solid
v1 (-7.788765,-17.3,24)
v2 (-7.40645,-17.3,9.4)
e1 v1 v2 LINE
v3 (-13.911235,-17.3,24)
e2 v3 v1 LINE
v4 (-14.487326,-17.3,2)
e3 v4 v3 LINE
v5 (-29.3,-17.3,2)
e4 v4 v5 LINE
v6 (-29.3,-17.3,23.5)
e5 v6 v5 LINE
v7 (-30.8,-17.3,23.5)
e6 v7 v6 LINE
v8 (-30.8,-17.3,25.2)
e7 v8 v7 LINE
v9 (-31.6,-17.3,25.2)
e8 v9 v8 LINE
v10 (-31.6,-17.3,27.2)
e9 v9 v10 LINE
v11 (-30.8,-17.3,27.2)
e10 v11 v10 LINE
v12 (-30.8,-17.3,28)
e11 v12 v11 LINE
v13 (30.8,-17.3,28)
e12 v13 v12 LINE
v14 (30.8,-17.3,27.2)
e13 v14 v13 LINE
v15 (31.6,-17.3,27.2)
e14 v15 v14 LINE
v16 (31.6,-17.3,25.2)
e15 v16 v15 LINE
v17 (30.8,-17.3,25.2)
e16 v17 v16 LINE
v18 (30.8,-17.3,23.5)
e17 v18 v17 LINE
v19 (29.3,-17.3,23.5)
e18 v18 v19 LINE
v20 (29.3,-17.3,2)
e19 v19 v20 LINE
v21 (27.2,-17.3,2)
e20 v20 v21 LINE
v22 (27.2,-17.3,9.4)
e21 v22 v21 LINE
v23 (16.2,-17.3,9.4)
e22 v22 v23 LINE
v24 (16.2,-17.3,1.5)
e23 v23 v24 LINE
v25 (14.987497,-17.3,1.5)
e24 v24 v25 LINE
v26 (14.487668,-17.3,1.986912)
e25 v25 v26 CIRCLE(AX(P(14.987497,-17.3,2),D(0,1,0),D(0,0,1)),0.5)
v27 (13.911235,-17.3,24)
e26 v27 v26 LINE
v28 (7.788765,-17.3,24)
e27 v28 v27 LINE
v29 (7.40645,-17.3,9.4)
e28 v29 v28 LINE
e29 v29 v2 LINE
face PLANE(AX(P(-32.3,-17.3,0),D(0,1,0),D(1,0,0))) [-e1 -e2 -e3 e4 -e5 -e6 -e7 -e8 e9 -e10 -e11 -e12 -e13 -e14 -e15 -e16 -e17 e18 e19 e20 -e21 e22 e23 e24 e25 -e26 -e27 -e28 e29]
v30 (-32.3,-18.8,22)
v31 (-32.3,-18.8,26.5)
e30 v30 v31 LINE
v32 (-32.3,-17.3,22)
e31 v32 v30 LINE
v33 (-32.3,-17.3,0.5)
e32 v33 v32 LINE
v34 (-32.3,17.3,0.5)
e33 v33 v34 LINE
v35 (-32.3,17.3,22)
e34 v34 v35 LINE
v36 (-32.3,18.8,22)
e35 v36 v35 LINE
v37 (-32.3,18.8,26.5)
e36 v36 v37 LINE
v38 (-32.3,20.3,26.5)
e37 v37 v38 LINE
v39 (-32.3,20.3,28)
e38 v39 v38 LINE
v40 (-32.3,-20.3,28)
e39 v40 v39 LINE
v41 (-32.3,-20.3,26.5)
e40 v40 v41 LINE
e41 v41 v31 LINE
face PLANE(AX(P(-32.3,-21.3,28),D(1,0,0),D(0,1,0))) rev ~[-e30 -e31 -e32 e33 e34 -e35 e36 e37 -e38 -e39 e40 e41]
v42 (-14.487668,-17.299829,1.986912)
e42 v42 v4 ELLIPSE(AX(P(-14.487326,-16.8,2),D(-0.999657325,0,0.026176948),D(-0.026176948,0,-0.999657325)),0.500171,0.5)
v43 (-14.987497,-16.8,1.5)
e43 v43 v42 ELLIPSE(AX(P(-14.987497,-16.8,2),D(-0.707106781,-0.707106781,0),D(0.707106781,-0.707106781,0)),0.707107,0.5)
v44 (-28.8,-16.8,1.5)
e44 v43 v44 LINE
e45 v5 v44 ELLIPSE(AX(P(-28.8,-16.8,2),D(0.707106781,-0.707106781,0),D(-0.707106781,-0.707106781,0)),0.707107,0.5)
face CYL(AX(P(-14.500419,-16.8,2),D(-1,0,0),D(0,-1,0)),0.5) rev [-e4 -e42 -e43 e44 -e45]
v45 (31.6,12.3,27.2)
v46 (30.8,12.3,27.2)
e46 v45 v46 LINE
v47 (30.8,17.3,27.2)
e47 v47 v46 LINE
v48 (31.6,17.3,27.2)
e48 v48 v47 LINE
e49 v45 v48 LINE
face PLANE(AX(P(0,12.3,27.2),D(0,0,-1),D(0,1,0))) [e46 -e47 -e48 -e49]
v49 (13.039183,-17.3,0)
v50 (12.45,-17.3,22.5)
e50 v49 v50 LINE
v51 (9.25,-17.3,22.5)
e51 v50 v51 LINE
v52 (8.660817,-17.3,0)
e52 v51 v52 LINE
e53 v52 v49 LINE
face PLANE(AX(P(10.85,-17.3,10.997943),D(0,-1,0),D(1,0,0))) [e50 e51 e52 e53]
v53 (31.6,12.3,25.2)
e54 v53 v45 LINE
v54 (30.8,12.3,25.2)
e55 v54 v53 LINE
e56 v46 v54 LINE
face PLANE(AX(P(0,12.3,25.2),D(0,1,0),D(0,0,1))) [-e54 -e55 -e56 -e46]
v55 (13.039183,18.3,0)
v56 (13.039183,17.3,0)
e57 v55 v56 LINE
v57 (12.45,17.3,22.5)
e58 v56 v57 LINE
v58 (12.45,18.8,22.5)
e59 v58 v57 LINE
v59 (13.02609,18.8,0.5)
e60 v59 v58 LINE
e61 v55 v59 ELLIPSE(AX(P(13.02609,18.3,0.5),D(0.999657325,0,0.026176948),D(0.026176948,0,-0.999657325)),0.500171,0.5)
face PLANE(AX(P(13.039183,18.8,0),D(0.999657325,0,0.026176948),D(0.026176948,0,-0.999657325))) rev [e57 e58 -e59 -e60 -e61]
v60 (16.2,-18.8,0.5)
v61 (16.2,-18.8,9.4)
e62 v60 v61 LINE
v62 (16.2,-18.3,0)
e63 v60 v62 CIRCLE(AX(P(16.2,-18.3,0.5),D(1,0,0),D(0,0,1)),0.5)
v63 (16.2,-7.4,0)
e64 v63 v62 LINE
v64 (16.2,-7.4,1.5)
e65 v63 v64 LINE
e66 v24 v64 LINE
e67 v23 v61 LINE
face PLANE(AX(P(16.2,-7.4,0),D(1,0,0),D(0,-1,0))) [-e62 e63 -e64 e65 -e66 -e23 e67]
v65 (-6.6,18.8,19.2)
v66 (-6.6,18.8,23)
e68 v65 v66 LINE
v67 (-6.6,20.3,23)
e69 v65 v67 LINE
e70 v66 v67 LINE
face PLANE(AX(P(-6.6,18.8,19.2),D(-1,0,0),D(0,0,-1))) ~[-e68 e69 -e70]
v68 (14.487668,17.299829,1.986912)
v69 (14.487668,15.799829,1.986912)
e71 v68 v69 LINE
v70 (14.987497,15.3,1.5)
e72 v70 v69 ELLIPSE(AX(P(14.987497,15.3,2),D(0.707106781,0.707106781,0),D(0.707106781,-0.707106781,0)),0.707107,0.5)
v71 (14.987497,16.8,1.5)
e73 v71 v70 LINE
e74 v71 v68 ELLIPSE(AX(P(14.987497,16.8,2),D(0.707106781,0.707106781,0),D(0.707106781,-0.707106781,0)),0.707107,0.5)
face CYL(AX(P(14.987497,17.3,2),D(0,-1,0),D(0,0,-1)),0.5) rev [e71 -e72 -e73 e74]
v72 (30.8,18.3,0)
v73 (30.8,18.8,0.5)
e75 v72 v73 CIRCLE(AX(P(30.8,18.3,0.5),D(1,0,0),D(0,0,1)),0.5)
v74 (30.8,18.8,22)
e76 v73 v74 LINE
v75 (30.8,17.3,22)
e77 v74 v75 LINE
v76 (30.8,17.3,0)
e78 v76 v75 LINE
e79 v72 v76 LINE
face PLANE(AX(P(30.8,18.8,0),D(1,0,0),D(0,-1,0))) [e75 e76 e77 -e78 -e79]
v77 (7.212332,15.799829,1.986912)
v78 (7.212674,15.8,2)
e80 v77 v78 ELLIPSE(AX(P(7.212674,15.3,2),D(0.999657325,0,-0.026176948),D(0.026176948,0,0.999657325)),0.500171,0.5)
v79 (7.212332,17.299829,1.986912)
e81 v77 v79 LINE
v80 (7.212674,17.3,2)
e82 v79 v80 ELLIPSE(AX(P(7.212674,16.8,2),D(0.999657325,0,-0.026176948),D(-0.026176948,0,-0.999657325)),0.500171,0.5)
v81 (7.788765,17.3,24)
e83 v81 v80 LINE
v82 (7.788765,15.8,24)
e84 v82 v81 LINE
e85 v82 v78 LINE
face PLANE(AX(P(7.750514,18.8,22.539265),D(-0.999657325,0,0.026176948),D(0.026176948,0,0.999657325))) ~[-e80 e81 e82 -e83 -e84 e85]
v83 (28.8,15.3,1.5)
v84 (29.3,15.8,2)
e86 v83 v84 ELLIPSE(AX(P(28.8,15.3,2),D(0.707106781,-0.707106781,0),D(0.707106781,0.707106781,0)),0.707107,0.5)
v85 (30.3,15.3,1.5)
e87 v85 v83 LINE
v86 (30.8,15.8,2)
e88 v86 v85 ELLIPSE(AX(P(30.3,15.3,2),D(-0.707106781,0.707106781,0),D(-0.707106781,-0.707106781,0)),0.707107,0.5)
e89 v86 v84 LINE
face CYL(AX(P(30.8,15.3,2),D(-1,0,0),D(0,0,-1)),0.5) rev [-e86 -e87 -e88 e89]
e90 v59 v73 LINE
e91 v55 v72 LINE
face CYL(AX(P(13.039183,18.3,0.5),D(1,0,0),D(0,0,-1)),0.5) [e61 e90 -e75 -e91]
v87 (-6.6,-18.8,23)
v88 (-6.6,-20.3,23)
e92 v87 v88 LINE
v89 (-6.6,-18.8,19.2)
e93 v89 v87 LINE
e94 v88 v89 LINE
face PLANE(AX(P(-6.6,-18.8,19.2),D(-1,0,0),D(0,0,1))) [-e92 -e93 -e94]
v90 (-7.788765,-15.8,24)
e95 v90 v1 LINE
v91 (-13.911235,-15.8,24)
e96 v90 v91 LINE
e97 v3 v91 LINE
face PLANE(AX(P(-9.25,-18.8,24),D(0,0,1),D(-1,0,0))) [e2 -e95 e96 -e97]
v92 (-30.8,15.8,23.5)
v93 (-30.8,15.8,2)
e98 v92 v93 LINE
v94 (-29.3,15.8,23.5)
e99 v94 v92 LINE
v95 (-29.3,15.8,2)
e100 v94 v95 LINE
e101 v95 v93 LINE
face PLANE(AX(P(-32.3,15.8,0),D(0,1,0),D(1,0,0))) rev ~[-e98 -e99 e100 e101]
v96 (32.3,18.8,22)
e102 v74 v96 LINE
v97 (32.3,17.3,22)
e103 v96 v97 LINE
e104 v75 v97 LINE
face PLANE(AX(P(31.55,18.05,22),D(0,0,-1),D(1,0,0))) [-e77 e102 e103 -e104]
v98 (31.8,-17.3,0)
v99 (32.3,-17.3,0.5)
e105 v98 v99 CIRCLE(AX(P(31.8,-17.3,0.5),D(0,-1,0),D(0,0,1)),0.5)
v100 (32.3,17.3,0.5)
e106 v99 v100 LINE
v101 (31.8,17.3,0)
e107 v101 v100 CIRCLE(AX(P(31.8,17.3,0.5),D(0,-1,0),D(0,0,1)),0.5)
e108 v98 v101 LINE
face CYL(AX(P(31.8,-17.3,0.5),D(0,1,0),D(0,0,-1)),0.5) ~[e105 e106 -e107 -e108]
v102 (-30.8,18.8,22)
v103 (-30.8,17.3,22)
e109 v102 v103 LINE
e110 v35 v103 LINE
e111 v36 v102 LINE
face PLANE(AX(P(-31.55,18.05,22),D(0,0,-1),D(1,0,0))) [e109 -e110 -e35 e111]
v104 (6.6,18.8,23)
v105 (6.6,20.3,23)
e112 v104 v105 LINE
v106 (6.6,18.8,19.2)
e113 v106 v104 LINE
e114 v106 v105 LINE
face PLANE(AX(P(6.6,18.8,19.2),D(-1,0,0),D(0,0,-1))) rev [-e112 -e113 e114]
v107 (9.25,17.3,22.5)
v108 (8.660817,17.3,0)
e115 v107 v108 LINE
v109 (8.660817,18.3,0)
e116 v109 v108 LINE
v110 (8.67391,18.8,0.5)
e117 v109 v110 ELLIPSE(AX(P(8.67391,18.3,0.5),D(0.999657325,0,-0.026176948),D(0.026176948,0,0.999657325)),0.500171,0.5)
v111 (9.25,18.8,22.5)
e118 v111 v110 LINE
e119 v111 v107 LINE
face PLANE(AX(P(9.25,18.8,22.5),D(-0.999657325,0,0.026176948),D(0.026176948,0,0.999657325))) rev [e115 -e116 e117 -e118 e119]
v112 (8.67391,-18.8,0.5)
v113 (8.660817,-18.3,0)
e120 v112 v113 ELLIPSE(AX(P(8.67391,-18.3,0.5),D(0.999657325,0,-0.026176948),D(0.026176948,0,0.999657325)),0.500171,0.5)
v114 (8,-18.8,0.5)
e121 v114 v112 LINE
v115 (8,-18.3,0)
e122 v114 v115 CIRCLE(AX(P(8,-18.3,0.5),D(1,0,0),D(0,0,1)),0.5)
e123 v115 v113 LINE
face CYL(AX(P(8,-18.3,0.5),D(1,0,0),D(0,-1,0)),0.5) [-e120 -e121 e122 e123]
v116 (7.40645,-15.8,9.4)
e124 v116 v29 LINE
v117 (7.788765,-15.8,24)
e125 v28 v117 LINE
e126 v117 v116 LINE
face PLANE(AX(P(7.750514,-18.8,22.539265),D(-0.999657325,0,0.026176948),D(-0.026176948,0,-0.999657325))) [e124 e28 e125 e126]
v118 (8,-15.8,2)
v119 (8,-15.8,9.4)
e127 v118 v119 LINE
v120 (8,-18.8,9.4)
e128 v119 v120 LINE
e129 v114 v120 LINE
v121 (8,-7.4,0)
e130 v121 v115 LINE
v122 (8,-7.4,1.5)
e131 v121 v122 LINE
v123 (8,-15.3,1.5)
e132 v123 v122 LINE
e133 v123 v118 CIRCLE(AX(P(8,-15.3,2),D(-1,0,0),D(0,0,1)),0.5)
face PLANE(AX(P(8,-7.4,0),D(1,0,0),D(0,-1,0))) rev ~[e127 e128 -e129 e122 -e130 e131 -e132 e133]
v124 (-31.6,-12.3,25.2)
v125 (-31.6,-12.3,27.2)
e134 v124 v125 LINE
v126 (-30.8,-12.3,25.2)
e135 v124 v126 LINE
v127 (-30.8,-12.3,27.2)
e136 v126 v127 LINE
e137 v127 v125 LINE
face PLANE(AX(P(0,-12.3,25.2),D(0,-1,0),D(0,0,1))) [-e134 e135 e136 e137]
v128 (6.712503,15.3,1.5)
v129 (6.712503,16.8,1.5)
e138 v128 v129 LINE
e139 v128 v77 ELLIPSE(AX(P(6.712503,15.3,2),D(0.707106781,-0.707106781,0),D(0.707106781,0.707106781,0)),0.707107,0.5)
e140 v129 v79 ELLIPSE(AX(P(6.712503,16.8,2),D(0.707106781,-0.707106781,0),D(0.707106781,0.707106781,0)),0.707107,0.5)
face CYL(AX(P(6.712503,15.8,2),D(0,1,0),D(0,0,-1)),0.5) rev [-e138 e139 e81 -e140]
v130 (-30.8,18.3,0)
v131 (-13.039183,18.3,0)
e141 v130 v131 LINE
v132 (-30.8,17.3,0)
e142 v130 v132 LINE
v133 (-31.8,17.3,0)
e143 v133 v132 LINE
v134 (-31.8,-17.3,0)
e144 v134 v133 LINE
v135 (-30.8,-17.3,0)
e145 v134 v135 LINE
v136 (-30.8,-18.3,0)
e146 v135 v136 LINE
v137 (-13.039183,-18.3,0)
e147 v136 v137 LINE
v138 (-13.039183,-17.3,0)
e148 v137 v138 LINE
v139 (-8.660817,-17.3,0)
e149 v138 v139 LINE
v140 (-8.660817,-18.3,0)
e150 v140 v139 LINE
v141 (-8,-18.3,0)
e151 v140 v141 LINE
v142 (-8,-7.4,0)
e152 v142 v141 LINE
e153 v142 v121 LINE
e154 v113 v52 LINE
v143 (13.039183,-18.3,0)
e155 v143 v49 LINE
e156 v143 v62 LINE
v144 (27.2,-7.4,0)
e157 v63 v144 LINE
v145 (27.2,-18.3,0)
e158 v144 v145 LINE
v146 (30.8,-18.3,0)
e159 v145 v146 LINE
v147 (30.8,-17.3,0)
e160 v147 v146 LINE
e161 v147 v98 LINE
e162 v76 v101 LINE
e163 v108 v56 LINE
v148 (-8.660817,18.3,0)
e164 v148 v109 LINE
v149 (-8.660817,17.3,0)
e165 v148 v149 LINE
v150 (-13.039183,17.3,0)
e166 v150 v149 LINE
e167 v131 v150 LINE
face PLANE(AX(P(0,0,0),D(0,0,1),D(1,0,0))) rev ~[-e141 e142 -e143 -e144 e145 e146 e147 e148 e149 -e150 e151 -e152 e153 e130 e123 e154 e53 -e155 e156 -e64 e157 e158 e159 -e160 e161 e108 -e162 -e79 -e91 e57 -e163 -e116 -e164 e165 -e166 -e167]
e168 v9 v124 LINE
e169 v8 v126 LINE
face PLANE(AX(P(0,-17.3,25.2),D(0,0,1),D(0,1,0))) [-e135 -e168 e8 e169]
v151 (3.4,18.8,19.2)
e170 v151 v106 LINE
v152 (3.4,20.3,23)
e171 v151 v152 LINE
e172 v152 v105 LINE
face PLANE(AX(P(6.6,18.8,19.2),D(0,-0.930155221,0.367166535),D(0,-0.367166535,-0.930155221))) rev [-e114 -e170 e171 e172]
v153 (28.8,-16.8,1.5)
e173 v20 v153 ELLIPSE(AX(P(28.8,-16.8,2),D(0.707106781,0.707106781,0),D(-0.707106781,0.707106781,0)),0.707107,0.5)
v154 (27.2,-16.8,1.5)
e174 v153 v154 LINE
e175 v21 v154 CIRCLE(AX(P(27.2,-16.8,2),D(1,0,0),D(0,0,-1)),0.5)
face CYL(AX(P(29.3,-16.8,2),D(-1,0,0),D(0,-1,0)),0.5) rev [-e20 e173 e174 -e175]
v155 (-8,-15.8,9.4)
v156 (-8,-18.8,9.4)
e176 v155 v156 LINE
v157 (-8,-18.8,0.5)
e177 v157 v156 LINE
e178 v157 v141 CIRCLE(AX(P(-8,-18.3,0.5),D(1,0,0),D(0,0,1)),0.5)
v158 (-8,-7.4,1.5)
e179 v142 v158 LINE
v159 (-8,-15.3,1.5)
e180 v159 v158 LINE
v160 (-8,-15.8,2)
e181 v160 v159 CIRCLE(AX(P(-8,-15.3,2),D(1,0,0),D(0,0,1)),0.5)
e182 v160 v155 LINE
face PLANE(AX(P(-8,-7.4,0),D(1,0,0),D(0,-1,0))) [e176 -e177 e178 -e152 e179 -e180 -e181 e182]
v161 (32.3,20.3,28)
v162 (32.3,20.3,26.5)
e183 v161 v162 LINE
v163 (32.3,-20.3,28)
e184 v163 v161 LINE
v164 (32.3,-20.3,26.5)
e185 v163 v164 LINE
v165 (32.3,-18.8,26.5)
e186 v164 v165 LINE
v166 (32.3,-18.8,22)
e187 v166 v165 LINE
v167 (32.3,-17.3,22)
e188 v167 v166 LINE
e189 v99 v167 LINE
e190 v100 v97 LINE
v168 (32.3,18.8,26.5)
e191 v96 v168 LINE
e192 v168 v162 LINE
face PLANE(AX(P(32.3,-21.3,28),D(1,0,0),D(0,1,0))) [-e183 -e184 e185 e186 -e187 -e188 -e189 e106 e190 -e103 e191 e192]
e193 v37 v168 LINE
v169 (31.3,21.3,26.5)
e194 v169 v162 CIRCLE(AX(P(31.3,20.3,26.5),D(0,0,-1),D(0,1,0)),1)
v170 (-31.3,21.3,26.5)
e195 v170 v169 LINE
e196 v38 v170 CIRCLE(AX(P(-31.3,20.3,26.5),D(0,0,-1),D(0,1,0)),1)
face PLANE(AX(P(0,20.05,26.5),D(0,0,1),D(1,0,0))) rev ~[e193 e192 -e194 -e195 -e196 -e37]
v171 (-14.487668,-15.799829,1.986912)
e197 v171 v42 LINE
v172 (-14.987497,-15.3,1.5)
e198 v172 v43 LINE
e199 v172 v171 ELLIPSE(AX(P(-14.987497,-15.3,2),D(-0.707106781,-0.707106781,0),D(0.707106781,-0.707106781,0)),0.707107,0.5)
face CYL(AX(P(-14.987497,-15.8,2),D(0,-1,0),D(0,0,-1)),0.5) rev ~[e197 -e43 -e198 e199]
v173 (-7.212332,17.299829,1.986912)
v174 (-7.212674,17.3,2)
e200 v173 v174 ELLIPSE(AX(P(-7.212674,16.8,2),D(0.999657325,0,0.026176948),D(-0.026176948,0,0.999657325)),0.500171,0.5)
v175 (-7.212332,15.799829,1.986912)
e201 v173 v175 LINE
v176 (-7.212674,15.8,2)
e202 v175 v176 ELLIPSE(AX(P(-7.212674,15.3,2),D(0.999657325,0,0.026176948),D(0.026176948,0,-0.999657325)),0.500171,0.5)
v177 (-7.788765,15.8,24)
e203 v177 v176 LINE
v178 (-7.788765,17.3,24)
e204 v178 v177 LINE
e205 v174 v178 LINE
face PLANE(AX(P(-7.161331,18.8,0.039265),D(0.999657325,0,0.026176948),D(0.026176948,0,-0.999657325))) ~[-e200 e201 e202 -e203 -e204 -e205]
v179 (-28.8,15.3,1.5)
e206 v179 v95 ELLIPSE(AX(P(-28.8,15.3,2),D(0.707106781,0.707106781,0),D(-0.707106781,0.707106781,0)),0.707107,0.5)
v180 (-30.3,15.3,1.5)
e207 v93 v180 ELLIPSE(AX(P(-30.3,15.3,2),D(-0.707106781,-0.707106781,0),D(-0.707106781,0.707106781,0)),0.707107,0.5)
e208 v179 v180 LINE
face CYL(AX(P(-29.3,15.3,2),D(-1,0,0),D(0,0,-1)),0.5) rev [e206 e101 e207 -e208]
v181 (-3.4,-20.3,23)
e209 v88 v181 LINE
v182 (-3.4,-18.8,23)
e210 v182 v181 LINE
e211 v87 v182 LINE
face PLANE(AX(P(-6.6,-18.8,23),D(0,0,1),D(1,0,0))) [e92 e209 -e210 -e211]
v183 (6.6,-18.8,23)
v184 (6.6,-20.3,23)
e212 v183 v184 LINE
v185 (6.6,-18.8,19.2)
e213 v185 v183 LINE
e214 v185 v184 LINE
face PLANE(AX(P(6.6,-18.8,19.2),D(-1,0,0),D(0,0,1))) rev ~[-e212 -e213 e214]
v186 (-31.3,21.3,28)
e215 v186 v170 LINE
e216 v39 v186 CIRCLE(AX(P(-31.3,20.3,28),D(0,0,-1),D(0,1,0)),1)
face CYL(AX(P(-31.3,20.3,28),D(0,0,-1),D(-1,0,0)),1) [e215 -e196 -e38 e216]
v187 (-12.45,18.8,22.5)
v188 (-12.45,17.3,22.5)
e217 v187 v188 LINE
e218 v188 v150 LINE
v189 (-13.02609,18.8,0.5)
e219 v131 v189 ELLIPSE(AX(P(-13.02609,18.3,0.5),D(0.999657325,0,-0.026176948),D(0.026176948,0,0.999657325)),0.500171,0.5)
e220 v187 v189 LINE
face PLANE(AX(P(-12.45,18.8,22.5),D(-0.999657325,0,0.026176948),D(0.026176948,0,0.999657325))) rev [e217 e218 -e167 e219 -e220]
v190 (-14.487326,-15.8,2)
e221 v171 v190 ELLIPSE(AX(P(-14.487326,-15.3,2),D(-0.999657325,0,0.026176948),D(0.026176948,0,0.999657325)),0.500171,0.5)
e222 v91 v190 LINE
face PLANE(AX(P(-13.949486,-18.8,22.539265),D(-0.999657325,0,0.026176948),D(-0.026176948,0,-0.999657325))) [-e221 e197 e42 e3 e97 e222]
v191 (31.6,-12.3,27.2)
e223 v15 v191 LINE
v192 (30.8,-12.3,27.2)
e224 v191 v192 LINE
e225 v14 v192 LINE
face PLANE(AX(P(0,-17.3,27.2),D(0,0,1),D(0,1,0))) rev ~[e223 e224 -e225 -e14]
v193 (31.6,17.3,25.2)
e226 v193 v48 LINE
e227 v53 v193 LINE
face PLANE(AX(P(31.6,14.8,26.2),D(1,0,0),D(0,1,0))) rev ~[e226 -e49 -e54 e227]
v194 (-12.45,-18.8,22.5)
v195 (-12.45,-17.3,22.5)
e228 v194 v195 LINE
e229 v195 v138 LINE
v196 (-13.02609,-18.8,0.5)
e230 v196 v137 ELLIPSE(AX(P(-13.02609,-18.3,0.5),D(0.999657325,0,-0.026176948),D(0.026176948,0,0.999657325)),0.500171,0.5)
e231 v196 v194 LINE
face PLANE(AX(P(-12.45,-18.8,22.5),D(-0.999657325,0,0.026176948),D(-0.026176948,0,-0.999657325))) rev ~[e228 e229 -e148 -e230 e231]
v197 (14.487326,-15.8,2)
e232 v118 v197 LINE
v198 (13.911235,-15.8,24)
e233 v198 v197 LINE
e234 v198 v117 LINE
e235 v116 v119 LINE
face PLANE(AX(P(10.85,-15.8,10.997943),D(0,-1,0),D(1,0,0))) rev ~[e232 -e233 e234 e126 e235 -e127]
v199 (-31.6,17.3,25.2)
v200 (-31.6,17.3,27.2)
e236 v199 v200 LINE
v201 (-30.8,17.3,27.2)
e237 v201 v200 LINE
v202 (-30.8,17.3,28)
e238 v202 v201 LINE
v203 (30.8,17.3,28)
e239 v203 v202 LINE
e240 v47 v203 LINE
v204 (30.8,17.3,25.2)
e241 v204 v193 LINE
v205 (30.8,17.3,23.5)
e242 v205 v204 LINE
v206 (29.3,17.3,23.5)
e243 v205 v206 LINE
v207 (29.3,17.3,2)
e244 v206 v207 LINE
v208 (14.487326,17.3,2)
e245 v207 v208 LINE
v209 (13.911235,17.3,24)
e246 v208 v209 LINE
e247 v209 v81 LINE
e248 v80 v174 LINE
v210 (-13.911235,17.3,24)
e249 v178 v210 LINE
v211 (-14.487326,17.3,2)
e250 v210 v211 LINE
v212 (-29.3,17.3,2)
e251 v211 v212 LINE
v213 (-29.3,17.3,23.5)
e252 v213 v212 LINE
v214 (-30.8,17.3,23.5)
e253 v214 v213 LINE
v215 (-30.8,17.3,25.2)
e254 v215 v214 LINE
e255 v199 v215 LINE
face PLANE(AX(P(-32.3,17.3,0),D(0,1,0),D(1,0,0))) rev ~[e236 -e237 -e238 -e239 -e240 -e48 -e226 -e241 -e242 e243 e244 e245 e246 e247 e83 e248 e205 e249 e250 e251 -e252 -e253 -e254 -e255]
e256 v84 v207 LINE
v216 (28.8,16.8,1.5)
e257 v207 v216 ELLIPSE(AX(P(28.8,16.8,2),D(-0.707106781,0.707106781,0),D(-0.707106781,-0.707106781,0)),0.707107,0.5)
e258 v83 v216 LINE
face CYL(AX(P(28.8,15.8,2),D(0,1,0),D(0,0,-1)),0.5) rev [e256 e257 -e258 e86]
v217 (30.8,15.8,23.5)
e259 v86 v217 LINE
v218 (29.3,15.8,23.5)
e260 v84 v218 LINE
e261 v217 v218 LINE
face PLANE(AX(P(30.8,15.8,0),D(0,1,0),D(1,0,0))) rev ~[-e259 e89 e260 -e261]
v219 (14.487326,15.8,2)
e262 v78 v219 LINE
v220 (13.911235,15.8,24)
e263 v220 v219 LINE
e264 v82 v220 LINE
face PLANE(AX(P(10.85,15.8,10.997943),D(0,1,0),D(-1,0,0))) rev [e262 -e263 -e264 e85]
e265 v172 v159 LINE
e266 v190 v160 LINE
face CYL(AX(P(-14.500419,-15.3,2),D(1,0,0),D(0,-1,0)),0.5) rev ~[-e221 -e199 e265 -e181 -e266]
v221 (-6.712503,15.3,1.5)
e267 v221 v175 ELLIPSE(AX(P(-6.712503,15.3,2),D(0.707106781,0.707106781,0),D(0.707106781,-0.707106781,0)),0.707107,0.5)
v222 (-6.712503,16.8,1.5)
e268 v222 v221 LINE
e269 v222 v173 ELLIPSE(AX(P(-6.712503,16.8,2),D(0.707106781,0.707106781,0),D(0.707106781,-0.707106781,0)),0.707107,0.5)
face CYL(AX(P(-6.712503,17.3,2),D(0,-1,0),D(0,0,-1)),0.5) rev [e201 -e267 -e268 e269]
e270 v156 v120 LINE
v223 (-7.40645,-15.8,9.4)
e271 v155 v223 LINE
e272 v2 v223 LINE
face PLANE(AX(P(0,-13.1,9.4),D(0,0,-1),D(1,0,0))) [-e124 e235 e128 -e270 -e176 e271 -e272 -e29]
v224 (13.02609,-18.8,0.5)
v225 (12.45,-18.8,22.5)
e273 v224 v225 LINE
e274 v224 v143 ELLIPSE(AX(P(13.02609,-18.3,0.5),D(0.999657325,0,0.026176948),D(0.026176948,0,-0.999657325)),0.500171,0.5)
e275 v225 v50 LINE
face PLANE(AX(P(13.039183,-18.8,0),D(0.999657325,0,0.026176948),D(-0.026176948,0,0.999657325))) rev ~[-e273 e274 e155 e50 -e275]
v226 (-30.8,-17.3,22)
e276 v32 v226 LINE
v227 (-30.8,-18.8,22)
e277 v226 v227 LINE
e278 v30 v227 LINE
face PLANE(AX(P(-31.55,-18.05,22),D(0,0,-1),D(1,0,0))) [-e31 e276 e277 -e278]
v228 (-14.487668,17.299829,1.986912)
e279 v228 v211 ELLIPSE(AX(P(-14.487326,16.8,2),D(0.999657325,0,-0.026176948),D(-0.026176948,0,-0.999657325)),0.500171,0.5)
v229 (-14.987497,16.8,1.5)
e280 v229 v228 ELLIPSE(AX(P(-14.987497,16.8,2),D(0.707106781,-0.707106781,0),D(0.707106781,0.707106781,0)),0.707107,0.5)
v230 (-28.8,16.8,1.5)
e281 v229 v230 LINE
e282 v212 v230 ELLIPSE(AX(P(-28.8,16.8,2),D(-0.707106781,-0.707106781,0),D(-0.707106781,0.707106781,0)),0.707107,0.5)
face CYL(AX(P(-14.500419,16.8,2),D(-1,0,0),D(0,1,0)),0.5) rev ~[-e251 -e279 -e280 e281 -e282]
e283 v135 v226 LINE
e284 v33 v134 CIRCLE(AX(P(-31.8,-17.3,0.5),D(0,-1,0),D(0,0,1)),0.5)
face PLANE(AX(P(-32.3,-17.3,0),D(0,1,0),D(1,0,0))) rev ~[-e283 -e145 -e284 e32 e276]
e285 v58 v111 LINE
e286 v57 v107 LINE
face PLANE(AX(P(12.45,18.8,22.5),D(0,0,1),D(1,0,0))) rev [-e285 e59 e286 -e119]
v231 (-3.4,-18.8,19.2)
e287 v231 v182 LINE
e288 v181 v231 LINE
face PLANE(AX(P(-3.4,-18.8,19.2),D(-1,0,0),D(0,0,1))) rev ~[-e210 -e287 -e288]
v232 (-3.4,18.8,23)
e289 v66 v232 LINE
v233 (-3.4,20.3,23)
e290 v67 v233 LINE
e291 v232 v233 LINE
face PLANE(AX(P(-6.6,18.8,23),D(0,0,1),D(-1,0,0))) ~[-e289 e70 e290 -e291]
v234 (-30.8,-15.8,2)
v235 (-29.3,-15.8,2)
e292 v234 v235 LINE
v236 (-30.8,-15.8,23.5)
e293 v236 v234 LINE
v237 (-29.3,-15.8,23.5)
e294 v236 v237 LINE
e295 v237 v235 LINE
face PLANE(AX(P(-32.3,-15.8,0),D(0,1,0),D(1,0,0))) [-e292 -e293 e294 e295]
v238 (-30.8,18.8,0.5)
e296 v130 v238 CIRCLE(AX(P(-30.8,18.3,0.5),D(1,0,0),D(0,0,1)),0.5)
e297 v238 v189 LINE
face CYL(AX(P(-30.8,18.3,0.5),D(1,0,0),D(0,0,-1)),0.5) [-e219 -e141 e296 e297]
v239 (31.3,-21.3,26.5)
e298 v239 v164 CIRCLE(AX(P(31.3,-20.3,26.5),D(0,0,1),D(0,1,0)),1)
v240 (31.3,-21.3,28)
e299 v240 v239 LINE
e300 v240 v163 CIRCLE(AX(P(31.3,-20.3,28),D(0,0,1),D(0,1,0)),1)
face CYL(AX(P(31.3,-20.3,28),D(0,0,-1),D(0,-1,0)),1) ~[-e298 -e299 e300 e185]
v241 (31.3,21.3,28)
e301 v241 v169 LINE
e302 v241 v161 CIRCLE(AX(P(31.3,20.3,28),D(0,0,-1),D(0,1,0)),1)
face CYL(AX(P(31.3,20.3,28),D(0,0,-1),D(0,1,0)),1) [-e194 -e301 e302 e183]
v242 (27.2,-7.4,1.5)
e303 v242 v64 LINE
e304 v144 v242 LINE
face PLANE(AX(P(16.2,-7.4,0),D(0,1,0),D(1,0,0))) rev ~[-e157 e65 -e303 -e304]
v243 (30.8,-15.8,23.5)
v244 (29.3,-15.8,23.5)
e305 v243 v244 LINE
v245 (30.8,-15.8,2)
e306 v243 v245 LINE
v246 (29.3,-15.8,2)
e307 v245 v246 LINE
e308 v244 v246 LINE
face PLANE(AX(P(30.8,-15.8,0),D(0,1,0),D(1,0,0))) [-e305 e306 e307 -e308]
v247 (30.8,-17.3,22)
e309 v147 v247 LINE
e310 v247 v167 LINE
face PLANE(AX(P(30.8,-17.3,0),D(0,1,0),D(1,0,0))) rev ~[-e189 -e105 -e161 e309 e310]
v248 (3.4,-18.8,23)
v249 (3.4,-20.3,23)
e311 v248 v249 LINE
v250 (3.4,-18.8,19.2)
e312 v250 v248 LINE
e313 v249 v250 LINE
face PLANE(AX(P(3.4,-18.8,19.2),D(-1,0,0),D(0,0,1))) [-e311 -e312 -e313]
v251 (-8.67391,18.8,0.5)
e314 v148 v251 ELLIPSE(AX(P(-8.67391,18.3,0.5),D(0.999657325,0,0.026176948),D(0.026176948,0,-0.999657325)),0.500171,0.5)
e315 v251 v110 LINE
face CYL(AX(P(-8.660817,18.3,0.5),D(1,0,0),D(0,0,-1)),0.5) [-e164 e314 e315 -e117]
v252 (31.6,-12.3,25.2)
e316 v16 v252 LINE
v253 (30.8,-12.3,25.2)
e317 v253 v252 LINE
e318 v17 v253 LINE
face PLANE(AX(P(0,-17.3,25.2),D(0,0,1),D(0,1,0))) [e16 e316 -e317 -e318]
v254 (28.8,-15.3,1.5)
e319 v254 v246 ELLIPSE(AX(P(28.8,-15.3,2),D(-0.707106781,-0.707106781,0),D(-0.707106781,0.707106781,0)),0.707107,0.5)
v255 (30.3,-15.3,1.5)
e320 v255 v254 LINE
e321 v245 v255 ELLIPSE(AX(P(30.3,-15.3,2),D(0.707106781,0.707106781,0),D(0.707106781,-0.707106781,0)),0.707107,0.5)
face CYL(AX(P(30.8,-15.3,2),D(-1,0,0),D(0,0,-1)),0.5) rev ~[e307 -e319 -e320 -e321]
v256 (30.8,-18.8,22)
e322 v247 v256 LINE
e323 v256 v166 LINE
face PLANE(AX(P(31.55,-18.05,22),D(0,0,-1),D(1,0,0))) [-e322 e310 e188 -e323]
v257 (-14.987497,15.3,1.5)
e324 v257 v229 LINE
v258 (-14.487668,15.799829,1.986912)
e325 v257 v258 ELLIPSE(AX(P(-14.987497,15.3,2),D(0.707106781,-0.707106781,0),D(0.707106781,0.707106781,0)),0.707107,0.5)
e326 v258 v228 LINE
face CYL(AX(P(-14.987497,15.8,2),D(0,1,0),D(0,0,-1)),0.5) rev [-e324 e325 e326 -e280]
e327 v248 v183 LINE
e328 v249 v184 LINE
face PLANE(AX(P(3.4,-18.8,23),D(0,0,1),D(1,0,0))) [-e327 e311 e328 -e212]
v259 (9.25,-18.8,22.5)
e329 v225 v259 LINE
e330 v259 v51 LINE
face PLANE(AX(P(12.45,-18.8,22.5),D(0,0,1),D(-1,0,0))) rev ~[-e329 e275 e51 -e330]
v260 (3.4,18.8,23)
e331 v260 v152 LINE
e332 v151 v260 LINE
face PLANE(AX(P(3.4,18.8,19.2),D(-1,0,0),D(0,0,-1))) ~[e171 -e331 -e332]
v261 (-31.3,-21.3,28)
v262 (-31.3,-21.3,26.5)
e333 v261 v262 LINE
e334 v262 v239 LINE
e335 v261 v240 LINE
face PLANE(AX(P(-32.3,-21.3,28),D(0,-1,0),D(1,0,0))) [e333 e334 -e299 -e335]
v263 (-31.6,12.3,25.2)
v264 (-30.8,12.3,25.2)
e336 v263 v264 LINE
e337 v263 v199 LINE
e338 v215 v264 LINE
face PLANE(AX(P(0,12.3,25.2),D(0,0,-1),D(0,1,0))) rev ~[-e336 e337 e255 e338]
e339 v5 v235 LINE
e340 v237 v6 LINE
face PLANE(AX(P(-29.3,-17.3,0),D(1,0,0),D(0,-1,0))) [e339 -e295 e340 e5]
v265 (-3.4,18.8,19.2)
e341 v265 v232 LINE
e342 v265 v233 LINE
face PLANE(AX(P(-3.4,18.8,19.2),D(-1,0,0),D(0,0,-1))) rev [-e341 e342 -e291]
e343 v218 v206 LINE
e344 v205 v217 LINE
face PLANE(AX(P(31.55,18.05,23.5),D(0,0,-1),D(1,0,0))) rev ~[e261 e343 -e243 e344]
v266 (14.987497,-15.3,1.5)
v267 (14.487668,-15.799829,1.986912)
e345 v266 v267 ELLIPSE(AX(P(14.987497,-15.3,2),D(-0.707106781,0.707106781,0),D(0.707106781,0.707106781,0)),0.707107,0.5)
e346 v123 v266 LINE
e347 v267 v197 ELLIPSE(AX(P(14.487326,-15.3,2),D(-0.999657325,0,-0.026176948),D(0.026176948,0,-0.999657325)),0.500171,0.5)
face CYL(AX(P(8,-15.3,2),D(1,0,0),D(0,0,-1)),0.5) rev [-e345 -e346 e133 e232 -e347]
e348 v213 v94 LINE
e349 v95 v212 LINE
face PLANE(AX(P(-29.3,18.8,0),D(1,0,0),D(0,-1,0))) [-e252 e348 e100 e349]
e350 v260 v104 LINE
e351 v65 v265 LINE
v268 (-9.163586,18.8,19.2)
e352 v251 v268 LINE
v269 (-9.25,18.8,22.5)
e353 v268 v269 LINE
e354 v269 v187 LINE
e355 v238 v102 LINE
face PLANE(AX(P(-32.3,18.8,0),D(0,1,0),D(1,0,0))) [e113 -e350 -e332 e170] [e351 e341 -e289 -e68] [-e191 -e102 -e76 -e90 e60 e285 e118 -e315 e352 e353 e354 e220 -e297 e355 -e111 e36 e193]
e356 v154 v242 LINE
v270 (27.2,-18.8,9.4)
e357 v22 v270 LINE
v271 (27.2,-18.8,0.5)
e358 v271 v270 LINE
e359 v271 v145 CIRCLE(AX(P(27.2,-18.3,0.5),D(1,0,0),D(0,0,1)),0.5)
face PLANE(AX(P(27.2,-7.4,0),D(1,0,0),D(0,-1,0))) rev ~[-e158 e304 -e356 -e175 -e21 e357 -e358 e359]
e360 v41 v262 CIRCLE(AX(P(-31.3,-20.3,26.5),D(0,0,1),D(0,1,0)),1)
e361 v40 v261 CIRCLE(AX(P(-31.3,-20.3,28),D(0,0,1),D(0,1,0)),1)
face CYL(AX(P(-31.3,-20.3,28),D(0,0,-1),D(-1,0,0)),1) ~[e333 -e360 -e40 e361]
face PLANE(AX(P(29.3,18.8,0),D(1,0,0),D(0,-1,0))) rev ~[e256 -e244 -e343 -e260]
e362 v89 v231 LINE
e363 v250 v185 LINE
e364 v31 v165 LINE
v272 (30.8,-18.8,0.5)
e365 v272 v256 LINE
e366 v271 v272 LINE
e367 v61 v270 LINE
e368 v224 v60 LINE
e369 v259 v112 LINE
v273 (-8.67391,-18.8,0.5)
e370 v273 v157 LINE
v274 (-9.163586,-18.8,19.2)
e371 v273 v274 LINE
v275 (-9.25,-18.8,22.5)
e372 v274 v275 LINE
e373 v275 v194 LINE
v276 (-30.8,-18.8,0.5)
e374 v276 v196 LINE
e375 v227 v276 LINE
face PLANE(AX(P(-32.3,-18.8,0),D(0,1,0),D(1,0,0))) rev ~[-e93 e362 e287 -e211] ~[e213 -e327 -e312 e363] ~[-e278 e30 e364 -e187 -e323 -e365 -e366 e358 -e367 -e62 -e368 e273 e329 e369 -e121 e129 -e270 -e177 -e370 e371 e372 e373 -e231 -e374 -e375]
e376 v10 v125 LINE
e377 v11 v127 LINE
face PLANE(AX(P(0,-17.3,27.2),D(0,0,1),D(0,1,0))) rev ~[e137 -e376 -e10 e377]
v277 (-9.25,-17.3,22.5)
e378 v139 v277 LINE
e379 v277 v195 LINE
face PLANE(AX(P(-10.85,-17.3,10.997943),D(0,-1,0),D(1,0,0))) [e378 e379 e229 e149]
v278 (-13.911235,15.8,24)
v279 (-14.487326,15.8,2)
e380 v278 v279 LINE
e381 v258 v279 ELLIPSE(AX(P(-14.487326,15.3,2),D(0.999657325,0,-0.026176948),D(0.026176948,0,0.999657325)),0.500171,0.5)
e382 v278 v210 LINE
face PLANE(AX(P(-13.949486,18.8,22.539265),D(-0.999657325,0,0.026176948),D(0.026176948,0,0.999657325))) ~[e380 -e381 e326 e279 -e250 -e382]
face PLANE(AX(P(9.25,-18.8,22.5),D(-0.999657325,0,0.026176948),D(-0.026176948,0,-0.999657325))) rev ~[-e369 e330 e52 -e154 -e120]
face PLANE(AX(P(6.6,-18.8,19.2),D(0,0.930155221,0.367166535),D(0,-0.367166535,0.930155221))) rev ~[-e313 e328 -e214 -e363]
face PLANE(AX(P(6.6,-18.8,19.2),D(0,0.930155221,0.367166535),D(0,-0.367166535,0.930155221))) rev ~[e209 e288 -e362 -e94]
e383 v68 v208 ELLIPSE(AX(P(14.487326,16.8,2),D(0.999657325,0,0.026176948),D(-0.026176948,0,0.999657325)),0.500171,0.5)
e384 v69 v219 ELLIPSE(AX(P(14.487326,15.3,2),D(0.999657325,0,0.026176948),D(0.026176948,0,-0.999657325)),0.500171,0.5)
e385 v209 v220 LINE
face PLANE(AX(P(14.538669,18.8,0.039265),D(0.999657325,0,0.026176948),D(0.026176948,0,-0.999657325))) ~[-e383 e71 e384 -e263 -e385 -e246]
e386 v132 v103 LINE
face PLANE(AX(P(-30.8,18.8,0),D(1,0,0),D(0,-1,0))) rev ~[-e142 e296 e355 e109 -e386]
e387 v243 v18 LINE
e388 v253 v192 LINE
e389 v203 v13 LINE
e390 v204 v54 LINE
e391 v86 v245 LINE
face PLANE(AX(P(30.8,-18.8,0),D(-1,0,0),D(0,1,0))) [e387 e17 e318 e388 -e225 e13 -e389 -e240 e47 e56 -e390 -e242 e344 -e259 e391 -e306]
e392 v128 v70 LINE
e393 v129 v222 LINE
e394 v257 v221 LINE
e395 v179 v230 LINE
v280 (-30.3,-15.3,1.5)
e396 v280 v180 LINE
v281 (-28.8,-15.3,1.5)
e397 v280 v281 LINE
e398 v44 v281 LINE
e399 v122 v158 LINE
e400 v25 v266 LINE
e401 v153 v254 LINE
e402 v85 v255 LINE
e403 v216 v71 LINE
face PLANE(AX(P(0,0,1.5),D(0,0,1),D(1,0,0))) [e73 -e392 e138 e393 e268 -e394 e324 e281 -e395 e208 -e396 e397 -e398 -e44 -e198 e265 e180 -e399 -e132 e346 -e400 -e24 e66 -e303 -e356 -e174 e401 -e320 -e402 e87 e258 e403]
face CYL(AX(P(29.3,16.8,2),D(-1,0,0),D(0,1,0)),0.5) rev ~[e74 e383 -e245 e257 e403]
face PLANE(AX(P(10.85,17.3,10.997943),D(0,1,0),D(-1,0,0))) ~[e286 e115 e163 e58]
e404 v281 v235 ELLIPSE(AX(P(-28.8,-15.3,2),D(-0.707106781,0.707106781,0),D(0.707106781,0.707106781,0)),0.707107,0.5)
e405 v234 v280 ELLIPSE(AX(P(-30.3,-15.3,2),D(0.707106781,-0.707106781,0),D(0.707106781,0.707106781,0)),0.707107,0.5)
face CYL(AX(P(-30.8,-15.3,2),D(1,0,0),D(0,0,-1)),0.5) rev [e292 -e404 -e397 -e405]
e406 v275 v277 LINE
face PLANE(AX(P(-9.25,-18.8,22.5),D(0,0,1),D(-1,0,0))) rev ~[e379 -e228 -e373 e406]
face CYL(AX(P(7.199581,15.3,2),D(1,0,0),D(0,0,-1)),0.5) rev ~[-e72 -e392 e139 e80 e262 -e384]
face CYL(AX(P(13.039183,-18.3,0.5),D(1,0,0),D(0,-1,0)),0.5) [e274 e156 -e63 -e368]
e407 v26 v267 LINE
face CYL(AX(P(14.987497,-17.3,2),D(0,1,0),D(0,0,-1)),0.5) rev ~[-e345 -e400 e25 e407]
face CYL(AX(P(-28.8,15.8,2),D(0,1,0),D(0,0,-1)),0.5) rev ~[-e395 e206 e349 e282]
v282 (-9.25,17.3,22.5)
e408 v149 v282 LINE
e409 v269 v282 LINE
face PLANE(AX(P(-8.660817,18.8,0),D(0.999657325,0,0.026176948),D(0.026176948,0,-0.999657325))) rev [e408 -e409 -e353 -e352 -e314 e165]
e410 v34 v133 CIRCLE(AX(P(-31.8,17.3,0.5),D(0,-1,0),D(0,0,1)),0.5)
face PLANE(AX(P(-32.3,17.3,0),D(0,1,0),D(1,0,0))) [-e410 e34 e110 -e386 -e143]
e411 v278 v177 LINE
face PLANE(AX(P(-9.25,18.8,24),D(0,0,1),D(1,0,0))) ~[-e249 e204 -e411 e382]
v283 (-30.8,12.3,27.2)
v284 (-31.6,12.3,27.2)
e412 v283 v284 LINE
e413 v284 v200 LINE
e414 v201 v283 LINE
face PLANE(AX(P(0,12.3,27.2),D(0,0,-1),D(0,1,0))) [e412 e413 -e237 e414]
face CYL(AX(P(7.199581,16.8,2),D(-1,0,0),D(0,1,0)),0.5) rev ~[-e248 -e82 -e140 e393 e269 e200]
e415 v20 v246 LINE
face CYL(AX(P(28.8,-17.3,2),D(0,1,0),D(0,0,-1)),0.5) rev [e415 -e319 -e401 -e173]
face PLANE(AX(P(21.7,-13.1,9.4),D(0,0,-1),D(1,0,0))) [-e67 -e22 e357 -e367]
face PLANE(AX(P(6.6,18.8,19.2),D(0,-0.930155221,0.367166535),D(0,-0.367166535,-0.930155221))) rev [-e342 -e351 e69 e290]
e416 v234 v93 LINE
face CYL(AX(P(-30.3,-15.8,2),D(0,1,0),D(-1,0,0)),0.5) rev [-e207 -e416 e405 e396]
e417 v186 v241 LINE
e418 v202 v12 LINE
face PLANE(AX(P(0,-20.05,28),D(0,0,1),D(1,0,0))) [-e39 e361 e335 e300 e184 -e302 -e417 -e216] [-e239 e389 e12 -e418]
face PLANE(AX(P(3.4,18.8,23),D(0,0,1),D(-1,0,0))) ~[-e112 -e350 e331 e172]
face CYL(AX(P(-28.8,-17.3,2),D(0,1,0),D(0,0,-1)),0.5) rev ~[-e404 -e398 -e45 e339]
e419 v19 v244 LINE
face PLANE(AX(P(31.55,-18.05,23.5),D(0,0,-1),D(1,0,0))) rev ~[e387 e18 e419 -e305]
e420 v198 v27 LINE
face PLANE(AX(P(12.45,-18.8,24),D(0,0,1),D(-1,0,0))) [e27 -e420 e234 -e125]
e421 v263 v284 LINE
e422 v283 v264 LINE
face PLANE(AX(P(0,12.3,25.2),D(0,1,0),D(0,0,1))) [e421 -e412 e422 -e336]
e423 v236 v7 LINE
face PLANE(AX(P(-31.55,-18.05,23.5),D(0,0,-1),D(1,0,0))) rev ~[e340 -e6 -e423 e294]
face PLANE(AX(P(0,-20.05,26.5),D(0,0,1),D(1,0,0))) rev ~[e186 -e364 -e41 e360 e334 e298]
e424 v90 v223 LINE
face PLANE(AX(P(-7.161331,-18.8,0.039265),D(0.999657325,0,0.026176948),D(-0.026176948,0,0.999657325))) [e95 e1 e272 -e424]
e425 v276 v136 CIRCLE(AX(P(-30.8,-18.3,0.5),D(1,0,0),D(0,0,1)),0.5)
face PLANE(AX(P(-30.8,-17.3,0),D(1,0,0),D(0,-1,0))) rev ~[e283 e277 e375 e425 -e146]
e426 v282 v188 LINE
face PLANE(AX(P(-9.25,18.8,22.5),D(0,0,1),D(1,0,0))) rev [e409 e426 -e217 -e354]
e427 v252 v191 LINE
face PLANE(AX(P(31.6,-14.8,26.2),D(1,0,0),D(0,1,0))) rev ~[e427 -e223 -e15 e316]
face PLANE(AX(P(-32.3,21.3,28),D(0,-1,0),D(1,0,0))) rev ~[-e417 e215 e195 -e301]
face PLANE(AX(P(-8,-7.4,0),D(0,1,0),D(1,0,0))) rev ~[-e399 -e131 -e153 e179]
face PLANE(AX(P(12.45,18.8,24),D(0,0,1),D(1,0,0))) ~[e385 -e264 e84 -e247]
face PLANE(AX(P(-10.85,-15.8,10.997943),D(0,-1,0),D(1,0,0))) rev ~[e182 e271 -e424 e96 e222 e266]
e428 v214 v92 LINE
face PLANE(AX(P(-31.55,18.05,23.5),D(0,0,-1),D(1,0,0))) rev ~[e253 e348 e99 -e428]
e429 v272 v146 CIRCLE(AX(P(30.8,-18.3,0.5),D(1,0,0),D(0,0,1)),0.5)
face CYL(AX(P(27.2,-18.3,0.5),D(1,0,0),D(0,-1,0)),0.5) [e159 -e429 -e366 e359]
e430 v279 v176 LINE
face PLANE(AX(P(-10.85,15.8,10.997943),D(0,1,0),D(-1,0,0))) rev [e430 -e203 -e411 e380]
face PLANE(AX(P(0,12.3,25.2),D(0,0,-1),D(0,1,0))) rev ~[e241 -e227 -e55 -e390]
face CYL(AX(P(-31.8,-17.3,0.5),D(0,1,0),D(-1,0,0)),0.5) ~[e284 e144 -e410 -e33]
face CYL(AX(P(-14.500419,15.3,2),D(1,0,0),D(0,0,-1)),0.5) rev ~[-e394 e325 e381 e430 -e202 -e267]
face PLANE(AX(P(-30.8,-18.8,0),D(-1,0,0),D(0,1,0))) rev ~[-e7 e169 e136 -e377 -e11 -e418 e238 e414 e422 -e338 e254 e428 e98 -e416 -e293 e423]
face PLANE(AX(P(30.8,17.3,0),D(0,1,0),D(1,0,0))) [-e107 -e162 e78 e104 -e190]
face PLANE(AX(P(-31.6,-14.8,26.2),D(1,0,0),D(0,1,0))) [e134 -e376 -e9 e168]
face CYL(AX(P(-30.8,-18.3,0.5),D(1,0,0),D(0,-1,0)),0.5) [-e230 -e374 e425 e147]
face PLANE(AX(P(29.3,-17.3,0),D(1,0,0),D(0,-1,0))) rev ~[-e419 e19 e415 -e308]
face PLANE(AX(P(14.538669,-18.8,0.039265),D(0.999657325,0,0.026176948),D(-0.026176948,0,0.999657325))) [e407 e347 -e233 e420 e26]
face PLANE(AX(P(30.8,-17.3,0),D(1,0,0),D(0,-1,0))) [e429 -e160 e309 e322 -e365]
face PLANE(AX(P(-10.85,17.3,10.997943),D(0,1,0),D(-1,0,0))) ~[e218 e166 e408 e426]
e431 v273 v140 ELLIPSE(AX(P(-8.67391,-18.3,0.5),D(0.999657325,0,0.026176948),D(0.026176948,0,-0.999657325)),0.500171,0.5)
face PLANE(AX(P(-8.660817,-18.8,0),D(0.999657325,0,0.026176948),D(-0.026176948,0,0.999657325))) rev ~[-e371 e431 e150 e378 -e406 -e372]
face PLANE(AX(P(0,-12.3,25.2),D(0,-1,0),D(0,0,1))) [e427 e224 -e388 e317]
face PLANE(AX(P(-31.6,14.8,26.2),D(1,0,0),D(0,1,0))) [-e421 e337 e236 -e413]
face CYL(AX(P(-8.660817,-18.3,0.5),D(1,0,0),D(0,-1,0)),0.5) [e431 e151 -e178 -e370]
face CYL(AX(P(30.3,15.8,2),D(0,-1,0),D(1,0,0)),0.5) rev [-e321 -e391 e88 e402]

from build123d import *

# Parameters (mm, degrees)
F0_W      = 64.6
F0_H      = 37.6
F1_DEPTH  = 28
F3_DEPTH  = 1.5
F4_W      = 1.5
F4_H      = 1.5
F5_DEPTH  = 22
F6_T      = -1.5
F7_W      = 64.6
F7_H      = 2.5
F8_DEPTH  = 1.5
F9_W      = 5
F9_H      = 2
F10_DEPTH = 31.6
F11_W     = 3.2
F11_H     = 3.8
F12_DEPTH = 1.5
F14_DEPTH = 38.901
F15_W     = 16
F15_H     = 11.4
F15_W_2   = 11
F16_DEPTH = 9.4
F17_R     = 1
F18_R     = 0.5


# Not quite as in the source:
# - two fillets or chamfers of one size are made in one step
# - a pattern or mirror of a feature is missing from the dataset's text; its kind, count and spacing are read off the source's solid


with BuildPart() as f1:
    # F0 (on Top) → F1 (new body)
    with BuildSketch(Plane.XY):
        Rectangle(F0_W, F0_H)
    extrude(amount=F1_DEPTH)

    # F2 (on face) → F3 (cut)
    with BuildSketch(Plane.XZ.offset(18.8)):
        Polygon((-13.0391832353, 0), (-8.6608167647, 0), (-9.25, 22.5), (-12.45, 22.5), align=None)
        Polygon((12.45, 22.5), (9.25, 22.5), (8.6608167647, 0), (13.0391832353, 0), align=None)
    f3 = extrude(amount=-F3_DEPTH, mode=Mode.SUBTRACT)

    # F3_copies: F3 across plane
    add(f3.mirror(Plane.ZX), mode=Mode.SUBTRACT)

    # F4 (on face) → F5 (cut)
    with BuildSketch(Plane(origin=(0, 0, 0), x_dir=(1, 0, 0), z_dir=(0, 0, -1))):
        with Locations((-31.55, 18.05)):
            Rectangle(F4_W, F4_H)
        with Locations((31.55, 18.05)):
            Rectangle(F4_W, F4_H)
        with Locations((31.55, -18.05)):
            Rectangle(F4_W, F4_H)
        with Locations((-31.55, -18.05)):
            Rectangle(F4_W, F4_H)
    extrude(amount=-F5_DEPTH, mode=Mode.SUBTRACT)

    # F6
    f6_openings = [f1.faces().sort_by_distance(p)[0] for p in [
        (0, 0, 28),
    ]]
    offset(amount=F6_T, openings=f6_openings, kind=Kind.INTERSECTION)

    # F7 (on face) → F8 (join)
    with BuildSketch(Plane.XY.offset(28)):
        with Locations((0, -20.05)):
            Rectangle(F7_W, F7_H)
        with Locations((0, 20.05)):
            Rectangle(F7_W, F7_H)
    extrude(amount=-F8_DEPTH)

    # F9 (on Right) → F10 (cut, symmetric)
    with BuildSketch(Plane.YZ):
        with Locations((-14.8, 26.2)):
            Rectangle(F9_W, F9_H)
        with Locations((14.8, 26.2)):
            Rectangle(F9_W, F9_H)
    extrude(amount=F10_DEPTH, both=True, mode=Mode.SUBTRACT)

    # F11 (on face) → F12 (join)
    with BuildSketch(Plane.XZ.offset(18.8)):
        with Locations((-5, 21.1)):
            Rectangle(F11_W, F11_H)
        with Locations((5, 21.1)):
            Rectangle(F11_W, F11_H)
    f12 = extrude(amount=F12_DEPTH)

    # F12_copies: F12 across plane
    add(f12.mirror(Plane.ZX))

    # F13 (on face) → F14 (cut, through all)
    with BuildSketch(Plane.YZ.offset(6.6)):
        Polygon((-18.8, 19.2), (-20.3, 23), (-20.3, 19.2), align=None)
    f14 = extrude(amount=-F14_DEPTH, mode=Mode.SUBTRACT)

    # F14_copies: F14 across plane
    add(f14.mirror(Plane.ZX), mode=Mode.SUBTRACT)

    # F15 (on face) → F16 (cut)
    with BuildSketch(Plane(origin=(0, 0, 0), x_dir=(1, 0, 0), z_dir=(0, 0, -1))):
        with Locations((0, 13.1)):
            Rectangle(F15_W, F15_H)
        with Locations((21.7, 13.1)):
            Rectangle(F15_W_2, F15_H)
    extrude(amount=-F16_DEPTH, mode=Mode.SUBTRACT)

    # F17
    f17_edges = [f1.edges().sort_by_distance(p)[0] for p in [
        (32.3, -21.3, 27.25),
        (32.3, 21.3, 27.25),
        (-32.3, -21.3, 27.25),
        (-32.3, 21.3, 27.25),
    ]]
    fillet(f17_edges, radius=F17_R)

    # F18
    f18_edges = [f1.edges().sort_by_distance(p)[0] for p in [
        (32.3, 0, 0),
        (29, -18.8, 0),
        (14.619592, -18.8, 0),
        (-8.330408, -18.8, 0),
        (-21.919592, -18.8, 0),
        (-32.3, 0, 0),
        (0, 18.8, 0),
        (8.330408, -18.8, 0),
        (-21.919592, 18.8, 0),
        (21.919592, 18.8, 0),
        (30.8, 0, 1.5),
        (-21.900209, -17.3, 1.5),
        (28.25, -17.3, 1.5),
        (-30.8, 0, 1.5),
        (-21.900209, 17.3, 1.5),
        (0, 17.3, 1.5),
        (21.900209, 17.3, 1.5),
        (29.3, -16.55, 1.5),
        (14.500419, -16.55, 1.5),
        (11.250209, -15.8, 1.5),
        (-11.250209, -15.8, 1.5),
        (-14.500419, -16.55, 1.5),
        (-29.3, -16.55, 1.5),
        (-30.05, -15.8, 1.5),
        (-30.05, 15.8, 1.5),
        (-29.3, 16.55, 1.5),
        (-14.500419, 16.55, 1.5),
        (-10.85, 15.8, 1.5),
        (-7.199581, 16.55, 1.5),
        (7.199581, 16.55, 1.5),
        (10.85, 15.8, 1.5),
        (14.500419, 16.55, 1.5),
        (29.3, 16.55, 1.5),
        (30.05, 15.8, 1.5),
        (30.05, -15.8, 1.5),
    ]]
    fillet(f18_edges, radius=F18_R)


solid = f1.part
